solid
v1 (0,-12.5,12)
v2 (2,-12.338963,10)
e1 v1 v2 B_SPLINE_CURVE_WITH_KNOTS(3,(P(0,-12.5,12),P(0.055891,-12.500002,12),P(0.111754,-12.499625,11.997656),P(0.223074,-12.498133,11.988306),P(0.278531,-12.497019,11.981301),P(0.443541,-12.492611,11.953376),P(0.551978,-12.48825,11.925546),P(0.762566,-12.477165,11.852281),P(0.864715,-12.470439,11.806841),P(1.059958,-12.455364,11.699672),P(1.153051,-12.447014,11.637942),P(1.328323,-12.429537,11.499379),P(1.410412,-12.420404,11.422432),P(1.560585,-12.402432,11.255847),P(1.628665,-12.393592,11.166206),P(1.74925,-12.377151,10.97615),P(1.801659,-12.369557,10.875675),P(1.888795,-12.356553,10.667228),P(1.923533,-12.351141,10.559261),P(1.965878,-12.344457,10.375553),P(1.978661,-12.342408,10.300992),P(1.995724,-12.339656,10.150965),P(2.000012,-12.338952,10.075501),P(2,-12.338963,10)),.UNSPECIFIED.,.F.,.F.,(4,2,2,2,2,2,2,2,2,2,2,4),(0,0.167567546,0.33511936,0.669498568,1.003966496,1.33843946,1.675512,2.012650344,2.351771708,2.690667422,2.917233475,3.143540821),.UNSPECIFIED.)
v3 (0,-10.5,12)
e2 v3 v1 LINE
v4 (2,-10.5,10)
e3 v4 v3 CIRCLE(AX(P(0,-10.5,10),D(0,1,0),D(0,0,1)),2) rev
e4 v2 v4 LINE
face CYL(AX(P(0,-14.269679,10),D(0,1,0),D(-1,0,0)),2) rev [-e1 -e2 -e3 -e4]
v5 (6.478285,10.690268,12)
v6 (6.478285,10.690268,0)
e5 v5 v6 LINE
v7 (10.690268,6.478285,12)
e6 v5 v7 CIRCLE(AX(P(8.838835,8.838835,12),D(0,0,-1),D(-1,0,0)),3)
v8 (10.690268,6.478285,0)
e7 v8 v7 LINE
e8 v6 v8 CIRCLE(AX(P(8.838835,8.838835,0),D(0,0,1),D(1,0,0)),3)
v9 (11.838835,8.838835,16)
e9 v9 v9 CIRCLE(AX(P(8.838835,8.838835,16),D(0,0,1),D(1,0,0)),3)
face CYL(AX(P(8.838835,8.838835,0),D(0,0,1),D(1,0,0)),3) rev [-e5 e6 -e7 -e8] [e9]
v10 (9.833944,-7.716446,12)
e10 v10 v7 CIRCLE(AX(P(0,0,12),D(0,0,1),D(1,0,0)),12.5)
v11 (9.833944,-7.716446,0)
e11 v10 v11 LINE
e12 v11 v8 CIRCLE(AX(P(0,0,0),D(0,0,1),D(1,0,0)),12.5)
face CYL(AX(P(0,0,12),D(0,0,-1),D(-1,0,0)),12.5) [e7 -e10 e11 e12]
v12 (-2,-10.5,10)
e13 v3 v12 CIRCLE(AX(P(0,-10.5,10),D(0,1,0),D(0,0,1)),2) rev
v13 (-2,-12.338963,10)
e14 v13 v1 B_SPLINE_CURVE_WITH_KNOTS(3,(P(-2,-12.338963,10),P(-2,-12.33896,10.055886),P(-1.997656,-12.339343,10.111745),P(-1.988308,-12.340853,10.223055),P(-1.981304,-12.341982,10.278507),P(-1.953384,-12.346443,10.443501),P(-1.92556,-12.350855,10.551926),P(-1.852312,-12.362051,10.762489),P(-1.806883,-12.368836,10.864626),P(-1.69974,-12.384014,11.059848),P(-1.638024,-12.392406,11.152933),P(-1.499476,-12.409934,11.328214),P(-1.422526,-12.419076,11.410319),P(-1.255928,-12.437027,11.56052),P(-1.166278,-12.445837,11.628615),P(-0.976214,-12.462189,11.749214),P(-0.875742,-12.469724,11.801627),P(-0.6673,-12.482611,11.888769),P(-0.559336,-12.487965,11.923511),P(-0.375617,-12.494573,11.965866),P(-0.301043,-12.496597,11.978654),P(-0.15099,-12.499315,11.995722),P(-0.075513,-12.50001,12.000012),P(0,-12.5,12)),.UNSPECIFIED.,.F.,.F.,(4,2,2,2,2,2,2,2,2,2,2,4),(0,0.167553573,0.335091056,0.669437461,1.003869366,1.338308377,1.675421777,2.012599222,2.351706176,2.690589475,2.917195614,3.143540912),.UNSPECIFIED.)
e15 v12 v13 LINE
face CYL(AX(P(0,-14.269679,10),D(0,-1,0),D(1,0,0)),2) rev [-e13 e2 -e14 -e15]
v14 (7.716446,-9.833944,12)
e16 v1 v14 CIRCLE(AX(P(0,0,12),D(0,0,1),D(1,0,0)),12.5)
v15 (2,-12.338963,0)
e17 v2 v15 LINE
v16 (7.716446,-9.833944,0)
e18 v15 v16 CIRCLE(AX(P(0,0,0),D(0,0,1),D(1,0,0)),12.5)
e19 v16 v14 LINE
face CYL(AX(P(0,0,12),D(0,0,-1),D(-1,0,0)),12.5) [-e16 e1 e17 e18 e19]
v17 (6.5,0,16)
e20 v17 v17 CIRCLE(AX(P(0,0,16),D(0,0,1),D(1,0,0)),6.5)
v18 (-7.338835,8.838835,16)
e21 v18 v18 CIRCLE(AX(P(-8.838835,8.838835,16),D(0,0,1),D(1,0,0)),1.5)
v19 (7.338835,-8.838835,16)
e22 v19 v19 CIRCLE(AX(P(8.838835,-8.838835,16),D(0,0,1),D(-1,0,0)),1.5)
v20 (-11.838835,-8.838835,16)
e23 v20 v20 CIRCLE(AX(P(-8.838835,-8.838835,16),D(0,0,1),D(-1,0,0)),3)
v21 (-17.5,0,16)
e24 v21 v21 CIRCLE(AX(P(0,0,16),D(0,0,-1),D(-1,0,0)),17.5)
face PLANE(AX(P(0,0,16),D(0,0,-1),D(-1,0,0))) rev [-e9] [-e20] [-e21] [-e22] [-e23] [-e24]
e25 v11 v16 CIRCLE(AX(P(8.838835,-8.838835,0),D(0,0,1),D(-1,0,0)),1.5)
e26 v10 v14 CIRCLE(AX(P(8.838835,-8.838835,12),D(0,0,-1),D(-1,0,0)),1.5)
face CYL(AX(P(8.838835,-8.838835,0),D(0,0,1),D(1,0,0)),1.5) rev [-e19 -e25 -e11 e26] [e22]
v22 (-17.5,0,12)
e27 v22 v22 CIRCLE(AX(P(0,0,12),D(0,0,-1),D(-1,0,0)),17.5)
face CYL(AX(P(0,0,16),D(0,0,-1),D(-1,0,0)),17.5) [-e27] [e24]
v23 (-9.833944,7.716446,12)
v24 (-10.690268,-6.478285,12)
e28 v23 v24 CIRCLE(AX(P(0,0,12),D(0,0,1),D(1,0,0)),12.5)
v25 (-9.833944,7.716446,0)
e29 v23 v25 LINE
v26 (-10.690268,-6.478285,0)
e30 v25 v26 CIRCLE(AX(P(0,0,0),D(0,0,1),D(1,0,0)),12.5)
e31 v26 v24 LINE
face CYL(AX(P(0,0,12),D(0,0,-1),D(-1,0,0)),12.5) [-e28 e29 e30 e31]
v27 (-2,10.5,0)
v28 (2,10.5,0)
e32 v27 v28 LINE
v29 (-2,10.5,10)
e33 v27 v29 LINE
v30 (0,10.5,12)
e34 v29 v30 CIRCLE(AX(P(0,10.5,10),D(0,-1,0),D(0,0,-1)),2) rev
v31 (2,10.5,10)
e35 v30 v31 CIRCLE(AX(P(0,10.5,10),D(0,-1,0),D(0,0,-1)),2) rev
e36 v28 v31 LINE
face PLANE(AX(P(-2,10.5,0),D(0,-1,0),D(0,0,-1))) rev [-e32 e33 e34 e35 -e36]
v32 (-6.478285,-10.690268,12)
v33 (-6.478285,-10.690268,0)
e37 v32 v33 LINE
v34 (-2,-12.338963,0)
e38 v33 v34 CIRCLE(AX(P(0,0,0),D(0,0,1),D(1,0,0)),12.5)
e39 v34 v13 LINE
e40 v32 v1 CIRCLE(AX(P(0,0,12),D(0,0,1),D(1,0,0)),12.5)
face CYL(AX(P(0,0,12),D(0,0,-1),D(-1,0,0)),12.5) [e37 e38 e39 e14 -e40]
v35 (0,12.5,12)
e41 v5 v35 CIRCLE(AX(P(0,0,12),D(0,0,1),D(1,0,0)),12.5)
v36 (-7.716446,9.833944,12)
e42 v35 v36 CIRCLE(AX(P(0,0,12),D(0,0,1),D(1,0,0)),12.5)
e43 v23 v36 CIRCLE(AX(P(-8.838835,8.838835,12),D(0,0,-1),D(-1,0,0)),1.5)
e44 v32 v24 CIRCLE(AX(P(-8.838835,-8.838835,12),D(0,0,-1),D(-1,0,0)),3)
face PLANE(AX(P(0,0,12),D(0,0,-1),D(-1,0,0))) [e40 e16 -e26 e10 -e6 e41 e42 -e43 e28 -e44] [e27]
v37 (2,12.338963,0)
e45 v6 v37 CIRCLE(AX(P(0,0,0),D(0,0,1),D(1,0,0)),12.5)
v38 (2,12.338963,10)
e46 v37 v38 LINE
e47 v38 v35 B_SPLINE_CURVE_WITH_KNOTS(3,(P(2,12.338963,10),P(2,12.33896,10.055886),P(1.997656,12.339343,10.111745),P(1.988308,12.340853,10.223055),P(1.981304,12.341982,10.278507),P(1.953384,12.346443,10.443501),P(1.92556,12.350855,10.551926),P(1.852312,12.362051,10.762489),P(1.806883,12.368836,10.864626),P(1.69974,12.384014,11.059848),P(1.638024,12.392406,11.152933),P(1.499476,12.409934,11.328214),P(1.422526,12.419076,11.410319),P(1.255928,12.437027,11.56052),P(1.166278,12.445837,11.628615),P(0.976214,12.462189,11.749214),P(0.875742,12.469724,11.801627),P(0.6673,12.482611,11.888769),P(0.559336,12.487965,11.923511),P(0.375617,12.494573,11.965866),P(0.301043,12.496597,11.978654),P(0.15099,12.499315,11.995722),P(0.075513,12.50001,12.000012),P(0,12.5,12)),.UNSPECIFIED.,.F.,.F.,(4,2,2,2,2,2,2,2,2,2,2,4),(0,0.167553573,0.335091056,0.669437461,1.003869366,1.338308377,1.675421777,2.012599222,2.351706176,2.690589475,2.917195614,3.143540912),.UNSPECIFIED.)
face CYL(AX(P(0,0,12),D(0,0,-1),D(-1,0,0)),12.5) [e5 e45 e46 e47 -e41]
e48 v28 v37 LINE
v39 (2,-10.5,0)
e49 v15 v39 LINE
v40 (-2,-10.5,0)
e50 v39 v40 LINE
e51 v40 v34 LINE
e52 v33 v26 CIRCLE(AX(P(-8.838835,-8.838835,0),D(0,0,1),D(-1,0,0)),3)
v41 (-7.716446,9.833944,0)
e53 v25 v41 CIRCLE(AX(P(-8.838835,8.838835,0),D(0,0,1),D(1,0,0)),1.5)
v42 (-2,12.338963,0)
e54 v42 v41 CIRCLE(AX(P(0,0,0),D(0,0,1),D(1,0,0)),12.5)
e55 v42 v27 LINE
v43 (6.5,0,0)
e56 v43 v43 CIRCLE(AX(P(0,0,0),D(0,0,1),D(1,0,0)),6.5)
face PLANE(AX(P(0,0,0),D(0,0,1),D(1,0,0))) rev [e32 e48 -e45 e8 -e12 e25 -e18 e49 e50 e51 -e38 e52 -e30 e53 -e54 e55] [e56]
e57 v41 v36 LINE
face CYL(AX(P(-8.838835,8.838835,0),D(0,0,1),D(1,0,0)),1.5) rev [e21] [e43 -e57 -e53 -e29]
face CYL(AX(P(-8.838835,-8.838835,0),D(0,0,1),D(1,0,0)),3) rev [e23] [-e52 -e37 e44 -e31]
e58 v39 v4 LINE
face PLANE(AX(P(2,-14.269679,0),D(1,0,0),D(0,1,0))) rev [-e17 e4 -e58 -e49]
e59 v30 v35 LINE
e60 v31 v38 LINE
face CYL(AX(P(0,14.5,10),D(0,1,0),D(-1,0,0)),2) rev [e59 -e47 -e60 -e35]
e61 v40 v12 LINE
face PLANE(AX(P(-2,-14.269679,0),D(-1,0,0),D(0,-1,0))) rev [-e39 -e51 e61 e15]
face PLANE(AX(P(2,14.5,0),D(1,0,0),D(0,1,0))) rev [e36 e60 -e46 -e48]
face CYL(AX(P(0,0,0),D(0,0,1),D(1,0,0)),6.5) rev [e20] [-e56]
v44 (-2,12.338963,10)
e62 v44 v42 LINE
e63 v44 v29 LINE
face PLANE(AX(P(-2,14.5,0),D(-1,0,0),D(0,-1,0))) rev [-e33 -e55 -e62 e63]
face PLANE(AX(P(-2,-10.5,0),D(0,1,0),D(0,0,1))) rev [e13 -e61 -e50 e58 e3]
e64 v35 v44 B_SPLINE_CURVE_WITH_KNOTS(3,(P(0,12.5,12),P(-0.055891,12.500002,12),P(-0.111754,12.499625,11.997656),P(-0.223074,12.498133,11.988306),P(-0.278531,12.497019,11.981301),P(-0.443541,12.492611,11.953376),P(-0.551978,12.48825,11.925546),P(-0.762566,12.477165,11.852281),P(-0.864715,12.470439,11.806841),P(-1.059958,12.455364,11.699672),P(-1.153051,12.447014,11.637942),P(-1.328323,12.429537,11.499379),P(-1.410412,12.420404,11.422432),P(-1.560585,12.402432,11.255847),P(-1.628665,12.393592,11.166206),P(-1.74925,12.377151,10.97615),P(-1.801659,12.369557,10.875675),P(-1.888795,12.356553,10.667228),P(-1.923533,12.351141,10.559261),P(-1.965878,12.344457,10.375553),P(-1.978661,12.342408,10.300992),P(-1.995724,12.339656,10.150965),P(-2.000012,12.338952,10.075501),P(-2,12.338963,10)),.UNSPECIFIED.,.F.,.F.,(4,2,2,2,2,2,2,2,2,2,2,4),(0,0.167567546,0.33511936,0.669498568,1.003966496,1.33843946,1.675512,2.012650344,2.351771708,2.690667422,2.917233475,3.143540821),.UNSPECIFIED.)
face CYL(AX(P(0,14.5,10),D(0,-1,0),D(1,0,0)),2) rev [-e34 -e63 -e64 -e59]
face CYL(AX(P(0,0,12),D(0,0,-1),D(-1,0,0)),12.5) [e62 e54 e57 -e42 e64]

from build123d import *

# Parameters (mm, degrees)
SKETCH_1_R          = 12.5
EXTRUDE_1_DEPTH     = 12
SKETCH_2_W          = 4
SKETCH_2_H          = 3.769678913
SKETCH_2_H_2        = 4
CUT_EXTRUDE_1_DEPTH = 22.365860619
SKETCH_3_R          = 6.5
CUT_EXTRUDE_2_DEPTH = 22.272047386
SKETCH_5_R          = 17.5
EXTRUDE_1_2_DEPTH   = 4
SKETCH_4_R          = 3
SKETCH_4_R_2        = 1.5
SKETCH_4_R_3        = 6.5
CUT_EXTRUDE_3_DEPTH = 30.470324057
FILLET_2_R          = 2


with BuildPart() as part:
    # 草图1 → Extrude 1 (new body)
    with BuildSketch(Plane.XY):
        Circle(SKETCH_1_R)
    extrude(amount=EXTRUDE_1_DEPTH)

    # 草图2 → 切除-拉伸1 (cut, through all)
    with BuildSketch(Plane.XY.offset(12)):
        with Locations((0, -12.384839456)):
            Rectangle(SKETCH_2_W, SKETCH_2_H)
        with Locations((0, 12.5)):
            Rectangle(SKETCH_2_W, SKETCH_2_H_2)
    extrude(amount=-CUT_EXTRUDE_1_DEPTH, mode=Mode.SUBTRACT)

    # 草图3 → 切除-拉伸2 (cut, through all)
    with BuildSketch(Plane.XY.offset(12)):
        Circle(SKETCH_3_R)
    extrude(amount=-CUT_EXTRUDE_2_DEPTH, mode=Mode.SUBTRACT)

    # 草图5 → Extrude 1 2 (add)
    with BuildSketch(Plane(origin=(0, 0, 12), x_dir=(-1, 0, 0), z_dir=(0, 0, -1))):
        Circle(SKETCH_5_R)
    extrude(amount=-EXTRUDE_1_2_DEPTH)

    # 草图4 → 切除-拉伸3 (cut, through all)
    with BuildSketch(Plane.XY.offset(16)):
        with Locations((8.838834765, 8.838834765)):
            Circle(SKETCH_4_R)
        with Locations((-8.838834765, 8.838834765)):
            Circle(SKETCH_4_R_2)
        with Locations(Location((-8.838834765, -8.838834765, 0), (0, 0, 321.892102579))):
            Circle(SKETCH_4_R)
        with Locations(Location((8.838834765, -8.838834765, 0), (0, 0, 48.439812768))):
            Circle(SKETCH_4_R_2)
        Circle(SKETCH_4_R_3)
    extrude(amount=-CUT_EXTRUDE_3_DEPTH, mode=Mode.SUBTRACT)

    # 圆角2
    fillet_2_edges = [part.edges().sort_by_distance(p)[0] for p in [
        (-2, -11.41948134, 12),
        (2, -11.41948134, 12),
        (2, 11.41948134, 12),
        (-2, 11.41948134, 12),
    ]]
    fillet(fillet_2_edges, radius=FILLET_2_R - 0.0001)  # a hair under: the kernel refuses the full size


solid = part.part
